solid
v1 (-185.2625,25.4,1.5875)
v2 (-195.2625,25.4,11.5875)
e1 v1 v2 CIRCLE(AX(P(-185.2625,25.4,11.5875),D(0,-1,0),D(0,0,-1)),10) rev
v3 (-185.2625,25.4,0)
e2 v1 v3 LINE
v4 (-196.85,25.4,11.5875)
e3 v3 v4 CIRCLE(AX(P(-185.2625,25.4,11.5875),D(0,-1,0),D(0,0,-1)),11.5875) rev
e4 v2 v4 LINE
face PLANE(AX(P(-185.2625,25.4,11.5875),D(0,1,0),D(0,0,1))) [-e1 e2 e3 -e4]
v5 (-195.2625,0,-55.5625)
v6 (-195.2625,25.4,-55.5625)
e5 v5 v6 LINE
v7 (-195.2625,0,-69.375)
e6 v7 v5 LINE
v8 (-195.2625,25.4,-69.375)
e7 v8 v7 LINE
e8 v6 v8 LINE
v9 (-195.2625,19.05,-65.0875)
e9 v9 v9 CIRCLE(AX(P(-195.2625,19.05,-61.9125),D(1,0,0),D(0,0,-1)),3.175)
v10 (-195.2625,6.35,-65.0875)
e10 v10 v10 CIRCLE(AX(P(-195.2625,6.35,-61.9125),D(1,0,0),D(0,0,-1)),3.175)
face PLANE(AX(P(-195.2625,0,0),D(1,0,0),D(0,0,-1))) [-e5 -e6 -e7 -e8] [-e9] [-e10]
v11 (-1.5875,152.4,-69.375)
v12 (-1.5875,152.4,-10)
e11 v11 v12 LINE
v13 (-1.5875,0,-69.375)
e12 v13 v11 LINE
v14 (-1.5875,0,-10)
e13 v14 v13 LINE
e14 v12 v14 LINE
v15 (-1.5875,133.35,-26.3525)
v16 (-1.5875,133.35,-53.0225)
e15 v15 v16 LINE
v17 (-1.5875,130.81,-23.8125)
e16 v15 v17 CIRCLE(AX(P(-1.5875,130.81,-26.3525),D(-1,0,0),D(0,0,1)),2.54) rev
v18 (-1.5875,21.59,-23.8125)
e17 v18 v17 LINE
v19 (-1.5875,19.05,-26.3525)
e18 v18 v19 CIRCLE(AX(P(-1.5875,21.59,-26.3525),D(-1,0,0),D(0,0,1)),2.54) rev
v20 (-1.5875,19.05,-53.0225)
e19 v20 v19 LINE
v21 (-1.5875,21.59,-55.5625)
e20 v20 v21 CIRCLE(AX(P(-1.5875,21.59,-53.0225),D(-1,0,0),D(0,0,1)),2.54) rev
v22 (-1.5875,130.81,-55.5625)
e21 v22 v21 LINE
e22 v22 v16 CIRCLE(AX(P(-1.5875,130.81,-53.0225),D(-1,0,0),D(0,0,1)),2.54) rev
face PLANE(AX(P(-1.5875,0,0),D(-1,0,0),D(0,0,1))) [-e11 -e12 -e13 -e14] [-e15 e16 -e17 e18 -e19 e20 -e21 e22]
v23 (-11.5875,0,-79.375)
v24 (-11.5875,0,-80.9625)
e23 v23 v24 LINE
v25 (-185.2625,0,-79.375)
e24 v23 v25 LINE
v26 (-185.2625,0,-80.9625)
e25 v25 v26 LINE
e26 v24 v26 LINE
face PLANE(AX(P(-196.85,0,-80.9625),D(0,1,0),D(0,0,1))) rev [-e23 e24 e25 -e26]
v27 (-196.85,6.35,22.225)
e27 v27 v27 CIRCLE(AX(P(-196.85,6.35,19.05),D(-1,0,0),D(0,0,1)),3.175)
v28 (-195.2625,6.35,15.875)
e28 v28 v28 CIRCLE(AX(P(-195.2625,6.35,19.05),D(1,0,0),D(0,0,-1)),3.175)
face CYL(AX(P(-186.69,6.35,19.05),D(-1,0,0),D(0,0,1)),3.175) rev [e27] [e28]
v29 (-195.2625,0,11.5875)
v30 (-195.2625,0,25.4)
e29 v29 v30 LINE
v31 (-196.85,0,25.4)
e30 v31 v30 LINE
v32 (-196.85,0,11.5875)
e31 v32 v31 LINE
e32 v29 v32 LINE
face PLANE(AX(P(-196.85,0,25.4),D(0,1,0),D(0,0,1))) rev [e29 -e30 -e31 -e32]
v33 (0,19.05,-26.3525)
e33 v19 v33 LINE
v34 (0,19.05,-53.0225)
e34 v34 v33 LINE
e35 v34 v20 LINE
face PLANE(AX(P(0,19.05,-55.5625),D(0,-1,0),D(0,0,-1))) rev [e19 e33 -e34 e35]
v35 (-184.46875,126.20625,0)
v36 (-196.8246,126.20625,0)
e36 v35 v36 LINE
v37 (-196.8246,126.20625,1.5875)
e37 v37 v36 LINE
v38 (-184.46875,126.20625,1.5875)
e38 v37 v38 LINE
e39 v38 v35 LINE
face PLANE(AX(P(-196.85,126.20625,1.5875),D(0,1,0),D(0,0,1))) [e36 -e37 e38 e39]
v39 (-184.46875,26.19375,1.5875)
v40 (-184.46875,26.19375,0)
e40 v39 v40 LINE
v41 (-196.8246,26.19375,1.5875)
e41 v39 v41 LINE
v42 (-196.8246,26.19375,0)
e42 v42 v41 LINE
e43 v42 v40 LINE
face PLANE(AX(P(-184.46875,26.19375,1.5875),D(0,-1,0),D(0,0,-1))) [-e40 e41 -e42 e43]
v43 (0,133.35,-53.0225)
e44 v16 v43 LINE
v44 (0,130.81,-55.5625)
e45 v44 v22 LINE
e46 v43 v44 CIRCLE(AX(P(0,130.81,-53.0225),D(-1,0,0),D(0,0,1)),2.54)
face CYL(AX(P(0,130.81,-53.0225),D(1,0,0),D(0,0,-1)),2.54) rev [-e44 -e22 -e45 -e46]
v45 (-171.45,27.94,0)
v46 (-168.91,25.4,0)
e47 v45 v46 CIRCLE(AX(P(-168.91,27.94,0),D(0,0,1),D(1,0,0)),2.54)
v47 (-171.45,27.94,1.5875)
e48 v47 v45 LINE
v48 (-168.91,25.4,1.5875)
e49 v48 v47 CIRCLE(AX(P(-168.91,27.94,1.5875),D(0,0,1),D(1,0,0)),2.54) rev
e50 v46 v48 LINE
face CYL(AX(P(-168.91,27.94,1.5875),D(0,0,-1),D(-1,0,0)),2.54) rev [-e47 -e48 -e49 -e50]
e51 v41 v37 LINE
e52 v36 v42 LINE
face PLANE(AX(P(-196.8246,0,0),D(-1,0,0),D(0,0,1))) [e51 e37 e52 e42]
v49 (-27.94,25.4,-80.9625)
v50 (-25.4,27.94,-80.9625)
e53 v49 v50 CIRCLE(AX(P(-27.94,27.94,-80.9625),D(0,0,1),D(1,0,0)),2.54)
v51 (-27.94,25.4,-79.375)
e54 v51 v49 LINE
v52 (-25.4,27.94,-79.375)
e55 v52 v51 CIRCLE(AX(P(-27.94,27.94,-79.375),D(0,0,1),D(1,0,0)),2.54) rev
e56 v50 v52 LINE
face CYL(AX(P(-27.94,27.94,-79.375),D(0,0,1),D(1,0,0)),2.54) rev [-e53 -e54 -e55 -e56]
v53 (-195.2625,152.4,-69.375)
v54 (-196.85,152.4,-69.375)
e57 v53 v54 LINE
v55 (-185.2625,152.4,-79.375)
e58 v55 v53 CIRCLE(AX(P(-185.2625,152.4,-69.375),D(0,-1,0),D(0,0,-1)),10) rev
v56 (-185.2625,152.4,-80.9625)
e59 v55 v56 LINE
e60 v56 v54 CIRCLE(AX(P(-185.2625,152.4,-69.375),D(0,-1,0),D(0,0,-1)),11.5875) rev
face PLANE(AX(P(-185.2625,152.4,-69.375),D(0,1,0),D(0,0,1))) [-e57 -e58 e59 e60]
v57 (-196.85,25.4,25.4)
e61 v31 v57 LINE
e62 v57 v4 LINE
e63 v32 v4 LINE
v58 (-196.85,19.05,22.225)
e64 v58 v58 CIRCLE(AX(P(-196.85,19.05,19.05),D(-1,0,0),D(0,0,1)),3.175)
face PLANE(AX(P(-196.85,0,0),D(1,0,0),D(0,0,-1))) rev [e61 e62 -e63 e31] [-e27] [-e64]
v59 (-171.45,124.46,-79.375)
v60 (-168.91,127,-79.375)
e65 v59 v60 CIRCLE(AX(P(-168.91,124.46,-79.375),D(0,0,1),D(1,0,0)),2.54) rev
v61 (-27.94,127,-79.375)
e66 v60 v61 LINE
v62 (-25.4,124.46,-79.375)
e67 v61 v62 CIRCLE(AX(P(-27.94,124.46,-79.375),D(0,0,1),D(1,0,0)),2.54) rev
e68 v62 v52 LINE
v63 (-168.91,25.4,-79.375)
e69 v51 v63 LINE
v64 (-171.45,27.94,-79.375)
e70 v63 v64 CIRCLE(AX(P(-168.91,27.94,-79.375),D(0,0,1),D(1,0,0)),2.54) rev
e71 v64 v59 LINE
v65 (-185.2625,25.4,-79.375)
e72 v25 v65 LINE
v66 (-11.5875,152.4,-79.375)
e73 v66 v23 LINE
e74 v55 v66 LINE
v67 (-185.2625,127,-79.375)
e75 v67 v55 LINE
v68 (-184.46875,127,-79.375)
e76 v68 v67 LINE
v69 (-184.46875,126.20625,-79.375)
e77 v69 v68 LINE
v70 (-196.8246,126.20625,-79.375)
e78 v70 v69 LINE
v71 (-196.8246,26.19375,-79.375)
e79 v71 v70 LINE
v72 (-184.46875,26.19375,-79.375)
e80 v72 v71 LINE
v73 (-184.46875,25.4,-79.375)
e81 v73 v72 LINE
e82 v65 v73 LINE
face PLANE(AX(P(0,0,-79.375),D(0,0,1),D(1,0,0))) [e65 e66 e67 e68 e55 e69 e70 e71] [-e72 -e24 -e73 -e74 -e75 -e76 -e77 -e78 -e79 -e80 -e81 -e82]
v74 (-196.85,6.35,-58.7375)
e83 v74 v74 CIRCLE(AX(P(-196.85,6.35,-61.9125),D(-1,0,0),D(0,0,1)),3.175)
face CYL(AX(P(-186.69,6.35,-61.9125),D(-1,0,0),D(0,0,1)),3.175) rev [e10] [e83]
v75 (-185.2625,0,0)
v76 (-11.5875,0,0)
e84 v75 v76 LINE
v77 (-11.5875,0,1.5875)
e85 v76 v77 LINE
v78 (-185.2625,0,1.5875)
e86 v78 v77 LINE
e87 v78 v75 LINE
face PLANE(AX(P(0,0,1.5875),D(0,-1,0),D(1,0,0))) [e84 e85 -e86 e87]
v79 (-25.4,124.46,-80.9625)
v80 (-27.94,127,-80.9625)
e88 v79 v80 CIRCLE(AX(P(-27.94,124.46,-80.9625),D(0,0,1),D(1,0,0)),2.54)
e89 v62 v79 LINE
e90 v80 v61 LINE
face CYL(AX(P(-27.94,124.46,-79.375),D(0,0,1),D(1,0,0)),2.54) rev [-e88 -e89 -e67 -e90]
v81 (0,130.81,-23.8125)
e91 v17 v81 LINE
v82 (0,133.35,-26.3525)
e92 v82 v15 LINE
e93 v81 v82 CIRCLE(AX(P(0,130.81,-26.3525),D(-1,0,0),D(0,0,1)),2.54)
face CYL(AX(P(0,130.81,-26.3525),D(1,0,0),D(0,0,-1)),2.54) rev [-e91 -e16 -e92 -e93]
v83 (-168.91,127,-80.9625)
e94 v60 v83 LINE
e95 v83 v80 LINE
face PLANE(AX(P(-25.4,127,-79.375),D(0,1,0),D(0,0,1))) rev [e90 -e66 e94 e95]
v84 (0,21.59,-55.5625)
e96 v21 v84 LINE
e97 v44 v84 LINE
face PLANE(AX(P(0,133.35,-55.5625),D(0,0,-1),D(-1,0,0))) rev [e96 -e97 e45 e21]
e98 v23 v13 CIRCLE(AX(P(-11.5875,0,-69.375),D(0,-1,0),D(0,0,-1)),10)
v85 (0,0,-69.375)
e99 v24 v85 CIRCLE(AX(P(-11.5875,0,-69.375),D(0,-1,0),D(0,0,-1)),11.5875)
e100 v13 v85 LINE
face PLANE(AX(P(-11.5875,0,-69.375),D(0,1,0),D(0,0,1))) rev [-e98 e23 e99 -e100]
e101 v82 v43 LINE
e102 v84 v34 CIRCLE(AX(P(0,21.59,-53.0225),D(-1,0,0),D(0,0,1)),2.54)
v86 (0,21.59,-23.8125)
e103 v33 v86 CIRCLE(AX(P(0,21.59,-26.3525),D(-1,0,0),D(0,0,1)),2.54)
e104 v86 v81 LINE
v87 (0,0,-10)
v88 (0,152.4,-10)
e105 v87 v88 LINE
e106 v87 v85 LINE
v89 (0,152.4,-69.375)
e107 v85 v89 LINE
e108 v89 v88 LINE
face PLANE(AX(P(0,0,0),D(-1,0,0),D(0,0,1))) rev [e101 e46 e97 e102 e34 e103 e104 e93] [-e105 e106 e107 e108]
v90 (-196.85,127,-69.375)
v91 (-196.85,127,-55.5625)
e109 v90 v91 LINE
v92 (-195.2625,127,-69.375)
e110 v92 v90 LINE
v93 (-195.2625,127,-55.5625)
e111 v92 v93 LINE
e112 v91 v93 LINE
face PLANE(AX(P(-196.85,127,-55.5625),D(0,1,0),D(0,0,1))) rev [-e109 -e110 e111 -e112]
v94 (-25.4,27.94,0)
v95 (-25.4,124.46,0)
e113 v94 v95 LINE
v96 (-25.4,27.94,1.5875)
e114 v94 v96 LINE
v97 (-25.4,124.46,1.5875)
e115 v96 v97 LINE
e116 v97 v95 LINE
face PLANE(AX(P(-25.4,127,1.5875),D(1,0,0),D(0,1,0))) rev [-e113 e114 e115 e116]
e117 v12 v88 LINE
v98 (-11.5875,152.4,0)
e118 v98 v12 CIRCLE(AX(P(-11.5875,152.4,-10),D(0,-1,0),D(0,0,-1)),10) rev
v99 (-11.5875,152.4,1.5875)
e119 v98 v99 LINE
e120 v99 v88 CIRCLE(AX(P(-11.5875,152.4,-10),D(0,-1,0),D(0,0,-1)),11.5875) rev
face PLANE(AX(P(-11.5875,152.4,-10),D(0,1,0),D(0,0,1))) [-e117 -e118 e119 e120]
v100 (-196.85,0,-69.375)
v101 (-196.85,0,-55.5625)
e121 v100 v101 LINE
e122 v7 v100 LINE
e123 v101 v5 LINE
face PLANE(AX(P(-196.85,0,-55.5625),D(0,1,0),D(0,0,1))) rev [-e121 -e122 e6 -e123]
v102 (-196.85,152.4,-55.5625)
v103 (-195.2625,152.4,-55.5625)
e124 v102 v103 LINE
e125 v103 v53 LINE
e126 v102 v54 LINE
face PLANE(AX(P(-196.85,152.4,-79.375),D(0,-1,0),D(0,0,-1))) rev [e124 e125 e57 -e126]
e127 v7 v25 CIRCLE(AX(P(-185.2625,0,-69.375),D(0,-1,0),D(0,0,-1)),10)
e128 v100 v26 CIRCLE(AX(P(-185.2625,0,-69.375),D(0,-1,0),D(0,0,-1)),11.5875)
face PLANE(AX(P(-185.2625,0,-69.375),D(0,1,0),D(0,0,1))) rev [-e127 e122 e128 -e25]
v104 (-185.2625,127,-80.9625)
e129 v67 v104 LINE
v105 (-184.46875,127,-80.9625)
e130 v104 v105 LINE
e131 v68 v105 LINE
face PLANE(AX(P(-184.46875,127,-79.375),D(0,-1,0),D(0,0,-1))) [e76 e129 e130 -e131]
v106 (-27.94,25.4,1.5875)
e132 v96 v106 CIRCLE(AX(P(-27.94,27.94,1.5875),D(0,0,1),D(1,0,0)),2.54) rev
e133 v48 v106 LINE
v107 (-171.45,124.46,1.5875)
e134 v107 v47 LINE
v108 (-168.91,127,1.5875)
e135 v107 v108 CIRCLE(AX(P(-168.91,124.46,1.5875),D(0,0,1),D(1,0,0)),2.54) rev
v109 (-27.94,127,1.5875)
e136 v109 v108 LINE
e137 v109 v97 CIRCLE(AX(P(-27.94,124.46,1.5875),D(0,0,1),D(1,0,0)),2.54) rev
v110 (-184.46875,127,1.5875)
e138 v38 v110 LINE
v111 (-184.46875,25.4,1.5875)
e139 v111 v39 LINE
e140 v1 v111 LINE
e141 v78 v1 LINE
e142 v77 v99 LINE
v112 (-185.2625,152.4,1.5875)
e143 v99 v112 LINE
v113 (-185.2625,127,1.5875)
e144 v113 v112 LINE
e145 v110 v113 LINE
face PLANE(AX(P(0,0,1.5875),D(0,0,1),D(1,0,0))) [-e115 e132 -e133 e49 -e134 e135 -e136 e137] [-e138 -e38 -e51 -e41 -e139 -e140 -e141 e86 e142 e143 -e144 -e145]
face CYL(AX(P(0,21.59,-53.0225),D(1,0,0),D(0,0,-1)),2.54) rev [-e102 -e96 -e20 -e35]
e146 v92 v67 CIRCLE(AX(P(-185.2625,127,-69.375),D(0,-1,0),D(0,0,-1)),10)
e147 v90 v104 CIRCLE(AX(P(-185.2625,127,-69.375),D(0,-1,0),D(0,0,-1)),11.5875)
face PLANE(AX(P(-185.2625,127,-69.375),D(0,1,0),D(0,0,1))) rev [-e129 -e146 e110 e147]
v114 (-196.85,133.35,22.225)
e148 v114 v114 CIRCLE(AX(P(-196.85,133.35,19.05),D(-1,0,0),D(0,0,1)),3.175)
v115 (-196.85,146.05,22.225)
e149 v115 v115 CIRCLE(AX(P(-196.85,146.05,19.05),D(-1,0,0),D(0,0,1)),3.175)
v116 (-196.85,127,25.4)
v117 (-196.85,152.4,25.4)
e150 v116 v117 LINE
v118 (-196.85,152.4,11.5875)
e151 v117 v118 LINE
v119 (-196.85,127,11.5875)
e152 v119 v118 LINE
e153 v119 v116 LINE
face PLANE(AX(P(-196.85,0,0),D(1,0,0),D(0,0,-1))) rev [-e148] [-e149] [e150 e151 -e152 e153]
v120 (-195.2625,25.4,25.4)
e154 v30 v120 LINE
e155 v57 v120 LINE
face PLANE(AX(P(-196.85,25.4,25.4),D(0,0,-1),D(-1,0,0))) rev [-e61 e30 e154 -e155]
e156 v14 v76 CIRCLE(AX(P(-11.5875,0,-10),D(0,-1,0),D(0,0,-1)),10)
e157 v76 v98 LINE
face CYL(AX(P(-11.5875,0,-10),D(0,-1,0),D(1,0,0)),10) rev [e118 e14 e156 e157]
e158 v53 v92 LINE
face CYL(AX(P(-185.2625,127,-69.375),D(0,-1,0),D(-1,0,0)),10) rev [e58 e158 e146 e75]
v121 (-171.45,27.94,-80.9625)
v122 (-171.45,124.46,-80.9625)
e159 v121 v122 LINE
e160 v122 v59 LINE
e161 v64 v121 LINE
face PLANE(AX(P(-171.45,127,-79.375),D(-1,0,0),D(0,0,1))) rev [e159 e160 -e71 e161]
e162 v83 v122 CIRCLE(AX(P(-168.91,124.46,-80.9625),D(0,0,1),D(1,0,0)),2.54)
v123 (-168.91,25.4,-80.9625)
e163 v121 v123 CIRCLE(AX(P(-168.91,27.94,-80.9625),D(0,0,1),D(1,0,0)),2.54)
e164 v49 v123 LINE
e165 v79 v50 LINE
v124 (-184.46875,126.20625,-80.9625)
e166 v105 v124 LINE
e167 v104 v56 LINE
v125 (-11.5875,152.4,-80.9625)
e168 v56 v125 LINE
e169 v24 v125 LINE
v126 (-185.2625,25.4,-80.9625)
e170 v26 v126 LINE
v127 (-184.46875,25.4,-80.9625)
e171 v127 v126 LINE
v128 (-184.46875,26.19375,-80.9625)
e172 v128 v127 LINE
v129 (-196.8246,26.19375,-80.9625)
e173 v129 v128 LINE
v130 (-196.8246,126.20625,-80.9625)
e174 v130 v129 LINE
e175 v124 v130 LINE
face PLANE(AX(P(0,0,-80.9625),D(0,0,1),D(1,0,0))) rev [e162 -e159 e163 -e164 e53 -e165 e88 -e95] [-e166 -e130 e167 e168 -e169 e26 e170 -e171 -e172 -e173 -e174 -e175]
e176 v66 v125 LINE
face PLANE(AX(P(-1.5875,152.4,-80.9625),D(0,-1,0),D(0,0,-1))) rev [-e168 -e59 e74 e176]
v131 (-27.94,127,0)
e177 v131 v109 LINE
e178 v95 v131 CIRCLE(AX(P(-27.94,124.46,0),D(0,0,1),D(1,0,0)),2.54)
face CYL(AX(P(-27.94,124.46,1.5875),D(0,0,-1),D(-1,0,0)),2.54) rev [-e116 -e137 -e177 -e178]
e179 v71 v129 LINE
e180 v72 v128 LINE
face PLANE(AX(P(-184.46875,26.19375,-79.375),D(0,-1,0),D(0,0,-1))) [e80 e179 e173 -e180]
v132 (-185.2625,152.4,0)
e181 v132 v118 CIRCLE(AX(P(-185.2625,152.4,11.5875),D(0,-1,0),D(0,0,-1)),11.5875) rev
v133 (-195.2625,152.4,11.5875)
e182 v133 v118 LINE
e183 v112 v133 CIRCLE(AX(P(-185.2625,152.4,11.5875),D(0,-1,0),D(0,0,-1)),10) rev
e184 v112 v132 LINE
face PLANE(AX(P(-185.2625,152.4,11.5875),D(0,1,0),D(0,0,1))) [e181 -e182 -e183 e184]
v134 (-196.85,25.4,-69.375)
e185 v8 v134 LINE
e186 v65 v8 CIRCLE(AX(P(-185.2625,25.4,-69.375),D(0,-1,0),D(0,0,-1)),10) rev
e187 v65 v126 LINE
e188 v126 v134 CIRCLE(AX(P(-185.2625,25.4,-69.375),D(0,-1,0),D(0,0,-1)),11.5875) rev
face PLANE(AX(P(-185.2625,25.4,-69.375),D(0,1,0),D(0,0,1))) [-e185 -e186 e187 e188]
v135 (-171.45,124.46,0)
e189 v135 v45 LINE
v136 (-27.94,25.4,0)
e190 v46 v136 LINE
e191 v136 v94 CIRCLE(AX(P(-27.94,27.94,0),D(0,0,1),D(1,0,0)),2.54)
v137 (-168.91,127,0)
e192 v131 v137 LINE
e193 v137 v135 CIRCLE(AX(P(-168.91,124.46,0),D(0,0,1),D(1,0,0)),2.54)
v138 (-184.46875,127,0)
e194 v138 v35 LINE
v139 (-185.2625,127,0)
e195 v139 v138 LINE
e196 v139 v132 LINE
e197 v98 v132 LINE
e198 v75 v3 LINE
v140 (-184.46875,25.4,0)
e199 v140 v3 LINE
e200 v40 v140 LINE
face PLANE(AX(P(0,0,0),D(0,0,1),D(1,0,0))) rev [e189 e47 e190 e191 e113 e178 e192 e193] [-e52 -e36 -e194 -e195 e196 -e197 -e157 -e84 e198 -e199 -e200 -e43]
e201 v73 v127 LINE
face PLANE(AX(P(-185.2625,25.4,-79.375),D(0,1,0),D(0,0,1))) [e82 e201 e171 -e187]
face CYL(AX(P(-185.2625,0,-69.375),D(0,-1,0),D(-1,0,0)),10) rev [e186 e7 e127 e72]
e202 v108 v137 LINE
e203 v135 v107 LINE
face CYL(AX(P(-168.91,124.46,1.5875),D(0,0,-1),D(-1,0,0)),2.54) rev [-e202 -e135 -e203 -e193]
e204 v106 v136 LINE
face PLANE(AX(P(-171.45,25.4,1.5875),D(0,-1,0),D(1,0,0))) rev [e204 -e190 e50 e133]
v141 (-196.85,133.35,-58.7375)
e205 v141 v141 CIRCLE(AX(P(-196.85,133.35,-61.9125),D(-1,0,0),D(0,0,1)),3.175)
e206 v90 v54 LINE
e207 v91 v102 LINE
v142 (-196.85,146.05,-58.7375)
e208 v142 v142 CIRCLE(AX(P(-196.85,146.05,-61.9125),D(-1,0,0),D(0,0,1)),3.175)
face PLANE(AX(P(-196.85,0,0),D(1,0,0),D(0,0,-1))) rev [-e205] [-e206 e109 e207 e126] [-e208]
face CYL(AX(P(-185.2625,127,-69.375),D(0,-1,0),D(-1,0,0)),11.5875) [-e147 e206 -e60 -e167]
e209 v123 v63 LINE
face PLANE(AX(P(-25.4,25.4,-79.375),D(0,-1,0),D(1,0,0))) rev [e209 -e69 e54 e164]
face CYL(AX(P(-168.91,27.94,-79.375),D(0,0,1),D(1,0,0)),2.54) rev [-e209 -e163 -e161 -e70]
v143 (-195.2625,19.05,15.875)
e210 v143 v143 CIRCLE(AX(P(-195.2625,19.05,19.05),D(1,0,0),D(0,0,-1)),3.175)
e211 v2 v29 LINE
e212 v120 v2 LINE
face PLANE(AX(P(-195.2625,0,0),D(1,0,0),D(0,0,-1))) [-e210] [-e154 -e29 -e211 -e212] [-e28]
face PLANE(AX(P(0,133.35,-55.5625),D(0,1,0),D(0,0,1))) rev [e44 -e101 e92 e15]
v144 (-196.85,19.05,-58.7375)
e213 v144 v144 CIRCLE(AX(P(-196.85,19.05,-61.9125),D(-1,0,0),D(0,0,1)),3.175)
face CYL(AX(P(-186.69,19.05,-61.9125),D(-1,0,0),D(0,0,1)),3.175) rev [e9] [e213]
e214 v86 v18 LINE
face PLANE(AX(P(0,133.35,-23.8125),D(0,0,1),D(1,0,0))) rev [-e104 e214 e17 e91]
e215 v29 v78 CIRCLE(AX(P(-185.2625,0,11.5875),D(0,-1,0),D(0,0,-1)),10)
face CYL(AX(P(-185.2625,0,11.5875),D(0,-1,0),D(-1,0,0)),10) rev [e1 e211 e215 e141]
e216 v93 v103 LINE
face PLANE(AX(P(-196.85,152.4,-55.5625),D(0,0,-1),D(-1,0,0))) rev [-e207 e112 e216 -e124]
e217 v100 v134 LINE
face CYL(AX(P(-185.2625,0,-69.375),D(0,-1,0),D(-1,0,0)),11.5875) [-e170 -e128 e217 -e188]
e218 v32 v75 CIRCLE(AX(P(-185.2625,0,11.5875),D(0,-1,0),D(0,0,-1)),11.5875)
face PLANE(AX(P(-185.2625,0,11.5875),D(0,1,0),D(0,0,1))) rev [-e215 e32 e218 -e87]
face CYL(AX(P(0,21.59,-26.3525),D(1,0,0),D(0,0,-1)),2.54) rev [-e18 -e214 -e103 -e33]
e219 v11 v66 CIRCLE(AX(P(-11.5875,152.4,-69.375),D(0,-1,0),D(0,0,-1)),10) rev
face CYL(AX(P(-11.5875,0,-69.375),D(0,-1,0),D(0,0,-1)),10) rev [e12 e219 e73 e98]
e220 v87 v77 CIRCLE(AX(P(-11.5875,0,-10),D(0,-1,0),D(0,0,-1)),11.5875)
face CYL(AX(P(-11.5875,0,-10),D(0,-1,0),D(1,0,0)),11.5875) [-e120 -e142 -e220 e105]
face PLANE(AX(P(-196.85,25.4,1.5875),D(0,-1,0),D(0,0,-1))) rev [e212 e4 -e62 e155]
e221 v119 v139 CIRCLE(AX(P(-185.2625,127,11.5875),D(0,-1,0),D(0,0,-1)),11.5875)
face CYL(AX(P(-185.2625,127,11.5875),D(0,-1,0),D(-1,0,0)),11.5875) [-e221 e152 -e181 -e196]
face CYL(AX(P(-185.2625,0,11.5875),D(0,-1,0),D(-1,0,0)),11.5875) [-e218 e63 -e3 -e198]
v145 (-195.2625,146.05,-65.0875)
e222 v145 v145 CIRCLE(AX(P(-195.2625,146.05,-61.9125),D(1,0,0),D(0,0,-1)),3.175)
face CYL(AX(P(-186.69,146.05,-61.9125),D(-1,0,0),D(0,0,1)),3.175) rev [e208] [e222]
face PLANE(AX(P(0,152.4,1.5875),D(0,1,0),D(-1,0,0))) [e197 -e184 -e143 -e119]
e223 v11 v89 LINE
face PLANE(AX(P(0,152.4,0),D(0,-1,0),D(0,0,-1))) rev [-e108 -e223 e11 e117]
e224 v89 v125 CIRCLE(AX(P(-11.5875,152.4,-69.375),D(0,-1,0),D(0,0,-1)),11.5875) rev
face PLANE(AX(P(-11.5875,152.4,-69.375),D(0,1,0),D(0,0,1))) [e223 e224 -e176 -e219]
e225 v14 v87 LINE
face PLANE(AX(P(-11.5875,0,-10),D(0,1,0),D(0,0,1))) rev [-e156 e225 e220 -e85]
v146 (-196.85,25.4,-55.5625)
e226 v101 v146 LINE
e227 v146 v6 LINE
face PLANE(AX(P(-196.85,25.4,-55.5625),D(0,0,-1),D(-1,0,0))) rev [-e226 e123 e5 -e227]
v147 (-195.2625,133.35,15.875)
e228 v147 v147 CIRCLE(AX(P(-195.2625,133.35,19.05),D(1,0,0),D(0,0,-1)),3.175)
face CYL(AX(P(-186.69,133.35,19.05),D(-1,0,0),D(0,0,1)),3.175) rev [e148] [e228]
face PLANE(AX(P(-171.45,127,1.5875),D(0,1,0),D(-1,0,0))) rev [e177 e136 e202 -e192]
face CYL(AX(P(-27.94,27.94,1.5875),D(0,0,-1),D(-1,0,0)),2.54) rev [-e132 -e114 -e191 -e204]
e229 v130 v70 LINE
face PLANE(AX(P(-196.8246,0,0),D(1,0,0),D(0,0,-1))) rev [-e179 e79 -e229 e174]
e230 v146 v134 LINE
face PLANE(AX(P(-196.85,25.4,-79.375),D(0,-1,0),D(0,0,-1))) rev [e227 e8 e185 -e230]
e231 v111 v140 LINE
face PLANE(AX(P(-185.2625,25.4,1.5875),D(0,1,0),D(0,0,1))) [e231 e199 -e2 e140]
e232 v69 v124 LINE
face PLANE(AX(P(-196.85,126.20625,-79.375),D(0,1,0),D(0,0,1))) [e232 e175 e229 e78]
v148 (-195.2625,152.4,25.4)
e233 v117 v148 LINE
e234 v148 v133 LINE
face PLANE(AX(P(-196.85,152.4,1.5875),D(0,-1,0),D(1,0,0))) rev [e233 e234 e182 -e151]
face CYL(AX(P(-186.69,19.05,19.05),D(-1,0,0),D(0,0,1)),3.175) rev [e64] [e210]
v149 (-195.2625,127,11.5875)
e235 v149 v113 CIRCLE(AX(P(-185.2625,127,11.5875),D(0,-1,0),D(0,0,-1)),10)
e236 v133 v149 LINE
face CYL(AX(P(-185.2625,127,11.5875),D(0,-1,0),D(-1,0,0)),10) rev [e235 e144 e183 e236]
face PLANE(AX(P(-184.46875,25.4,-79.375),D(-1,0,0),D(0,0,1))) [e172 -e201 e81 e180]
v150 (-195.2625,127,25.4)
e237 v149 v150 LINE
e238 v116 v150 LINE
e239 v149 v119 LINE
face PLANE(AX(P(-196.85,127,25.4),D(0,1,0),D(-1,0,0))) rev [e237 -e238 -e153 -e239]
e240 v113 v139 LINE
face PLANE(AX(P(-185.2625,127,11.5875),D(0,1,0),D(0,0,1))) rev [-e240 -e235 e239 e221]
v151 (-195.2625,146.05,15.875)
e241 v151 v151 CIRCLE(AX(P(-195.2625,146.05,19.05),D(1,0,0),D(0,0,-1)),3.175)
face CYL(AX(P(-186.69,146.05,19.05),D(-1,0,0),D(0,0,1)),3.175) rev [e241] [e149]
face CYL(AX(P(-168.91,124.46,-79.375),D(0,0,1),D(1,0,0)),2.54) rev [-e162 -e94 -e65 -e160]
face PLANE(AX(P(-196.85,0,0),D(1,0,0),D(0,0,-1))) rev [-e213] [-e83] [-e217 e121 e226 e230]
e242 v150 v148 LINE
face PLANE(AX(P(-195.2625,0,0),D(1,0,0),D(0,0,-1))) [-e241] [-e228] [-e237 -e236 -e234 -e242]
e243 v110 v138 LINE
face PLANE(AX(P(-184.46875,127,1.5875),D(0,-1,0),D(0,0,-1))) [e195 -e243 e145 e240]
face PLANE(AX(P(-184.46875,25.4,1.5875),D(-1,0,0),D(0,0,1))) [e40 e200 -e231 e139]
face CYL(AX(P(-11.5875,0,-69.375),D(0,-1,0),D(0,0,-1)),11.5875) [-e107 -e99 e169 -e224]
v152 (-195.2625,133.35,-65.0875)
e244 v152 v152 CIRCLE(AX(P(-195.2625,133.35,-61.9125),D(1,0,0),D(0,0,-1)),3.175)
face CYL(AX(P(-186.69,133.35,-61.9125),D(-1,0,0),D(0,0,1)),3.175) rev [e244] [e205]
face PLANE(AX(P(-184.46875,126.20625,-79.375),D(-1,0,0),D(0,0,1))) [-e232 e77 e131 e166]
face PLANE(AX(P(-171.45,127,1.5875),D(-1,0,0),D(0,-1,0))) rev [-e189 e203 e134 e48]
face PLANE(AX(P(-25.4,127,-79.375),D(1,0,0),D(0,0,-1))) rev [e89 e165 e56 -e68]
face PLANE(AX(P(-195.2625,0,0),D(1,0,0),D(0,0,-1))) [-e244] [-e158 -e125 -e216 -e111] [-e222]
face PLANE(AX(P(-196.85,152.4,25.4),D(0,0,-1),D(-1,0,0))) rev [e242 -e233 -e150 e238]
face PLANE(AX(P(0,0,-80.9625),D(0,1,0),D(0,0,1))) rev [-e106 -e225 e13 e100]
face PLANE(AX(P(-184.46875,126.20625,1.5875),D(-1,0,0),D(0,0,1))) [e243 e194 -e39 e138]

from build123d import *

# Parameters (mm, degrees)
SKETCH1_W                     = 196.85
SKETCH1_H                     = 152.4
SKETCH1_W_2                   = 146.05
SKETCH1_H_2                   = 101.6
BOSS_EXTRUDE1_DEPTH           = 1.5875
EDGE_FLANGE1_STRIP_W          = 26.35
EDGE_FLANGE1_STRIP_H          = 1.5875
EDGE_FLANGE1_STRIP_CUT_DEPTH  = 152.4
EDGE_FLANGE1_DEPTH            = 152.4
EDGE_FLANGE2_STRIP_W          = 26.35
EDGE_FLANGE2_STRIP_H          = 1.5875
EDGE_FLANGE2_STRIP_CUT_DEPTH  = 152.4
EDGE_FLANGE2_DEPTH            = 152.4
SKETCH16_W                    = 146.05
SKETCH16_H                    = 101.6
CUT_EXTRUDE1_DEPTH            = 1.5875
SKETCH17_W                    = 31.75
SKETCH17_H                    = 114.3
CUT_EXTRUDE2_DEPTH            = 1.5875
SKETCH25_W                    = 1.5875
SKETCH25_H                    = 101.6
CUT_EXTRUDE3_DEPTH            = 0.0254
EDGE_FLANGE5_STRIP_W          = 26.35
EDGE_FLANGE5_STRIP_H          = 1.5875
EDGE_FLANGE5_STRIP_CUT_DEPTH  = 25.4
EDGE_FLANGE5_RELIEF_W         = 27.14375
EDGE_FLANGE5_RELIEF_H         = 0.79375
EDGE_FLANGE5_RELIEF_CUT_DEPTH = 1.5875
EDGE_FLANGE5_DEPTH            = 25.4
EDGE_FLANGE6_STRIP_W          = 26.35
EDGE_FLANGE6_STRIP_H          = 1.5875
EDGE_FLANGE6_STRIP_CUT_DEPTH  = 25.4
EDGE_FLANGE6_RELIEF_W         = 27.14375
EDGE_FLANGE6_RELIEF_H         = 0.79375
EDGE_FLANGE6_RELIEF_CUT_DEPTH = 1.5875
EDGE_FLANGE6_DEPTH            = 25.4
SKETCH32_R                    = 3.175
CUT_EXTRUDE4_DEPTH            = 10.16
SKETCH33_R                    = 3.175
CUT_EXTRUDE5_DEPTH            = 10.16
FILLET1_R                     = 2.54
FILLET2_R                     = 2.54
FILLET3_R                     = 2.54
SKETCH35_W                    = 1.5875
SKETCH35_H                    = 101.6
CUT_EXTRUDE6_DEPTH            = 0.0254
EDGE_FLANGE7_STRIP_W          = 26.35
EDGE_FLANGE7_STRIP_H          = 1.5875
EDGE_FLANGE7_STRIP_CUT_DEPTH  = 25.4
EDGE_FLANGE7_RELIEF_W         = 27.14375
EDGE_FLANGE7_RELIEF_H         = 0.79375
EDGE_FLANGE7_RELIEF_CUT_DEPTH = 1.5875
EDGE_FLANGE7_DEPTH            = 25.4
EDGE_FLANGE8_STRIP_W          = 26.35
EDGE_FLANGE8_STRIP_H          = 1.5875
EDGE_FLANGE8_STRIP_CUT_DEPTH  = 25.4
EDGE_FLANGE8_RELIEF_W         = 27.14375
EDGE_FLANGE8_RELIEF_H         = 0.79375
EDGE_FLANGE8_RELIEF_CUT_DEPTH = 1.5875
EDGE_FLANGE8_DEPTH            = 25.4
SKETCH42_R                    = 3.175
CUT_EXTRUDE7_DEPTH            = 10.16
SKETCH43_R                    = 3.175
CUT_EXTRUDE8_DEPTH            = 10.16


# Sheet-metal steps are written as plain solids
with BuildPart() as part:
    # Sketch1 → Boss-Extrude1 (new body)
    with BuildSketch(Plane.XY):
        with Locations((-98.425, 76.2)):
            Rectangle(SKETCH1_W, SKETCH1_H)
        with Locations((-98.425, 76.2)):
            Rectangle(SKETCH1_W_2, SKETCH1_H_2, mode=Mode.SUBTRACT)
    extrude(amount=BOSS_EXTRUDE1_DEPTH)

    # Edge-Flange1 strip (across the edge) → Edge-Flange1 strip cut (cut)
    with BuildSketch(Plane(origin=(0, 152.4, 0), x_dir=(-1, 0, 0), z_dir=(0, -1, 0))):
        with Locations((-1.5875, -0.79375)):
            Rectangle(EDGE_FLANGE1_STRIP_W, EDGE_FLANGE1_STRIP_H)
    extrude(amount=EDGE_FLANGE1_STRIP_CUT_DEPTH, mode=Mode.SUBTRACT)

    # Edge-Flange1 section (across the edge) → Edge-Flange1 (add)
    with BuildSketch(Plane(origin=(0, 152.4, 0), x_dir=(-1, 0, 0), z_dir=(0, -1, 0))):
        with BuildLine():
            Line((0, 10), (0, 80.9625))
            Line((0, 80.9625), (1.5875, 80.9625))
            Line((1.5875, 80.9625), (1.5875, 10))
            ThreePointArc((1.5875, 10), (4.516432188, 2.928932188), (11.5875, 0))
            Line((11.5875, 0), (11.5875, -1.5875))
            ThreePointArc((11.5875, -1.5875), (3.393900173, 1.806400173), (0, 10))
        make_face()
    extrude(amount=EDGE_FLANGE1_DEPTH)

    # Edge-Flange2 strip (across the edge) → Edge-Flange2 strip cut (cut)
    with BuildSketch(Plane(origin=(-1.5875, 152.4, -80.9625), x_dir=(0, 0, 1), z_dir=(0, -1, 0))):
        with Locations((-1.5875, -0.79375)):
            Rectangle(EDGE_FLANGE2_STRIP_W, EDGE_FLANGE2_STRIP_H)
    extrude(amount=EDGE_FLANGE2_STRIP_CUT_DEPTH, mode=Mode.SUBTRACT)

    # Edge-Flange2 section (across the edge) → Edge-Flange2 (add)
    with BuildSketch(Plane(origin=(-1.5875, 152.4, -80.9625), x_dir=(0, 0, 1), z_dir=(0, -1, 0))):
        with BuildLine():
            Line((0, 10), (0, 195.2625))
            Line((0, 195.2625), (1.5875, 195.2625))
            Line((1.5875, 195.2625), (1.5875, 10))
            ThreePointArc((1.5875, 10), (4.516432188, 2.928932188), (11.5875, 0))
            Line((11.5875, 0), (11.5875, -1.5875))
            ThreePointArc((11.5875, -1.5875), (3.393900173, 1.806400173), (0, 10))
        make_face()
    extrude(amount=EDGE_FLANGE2_DEPTH)

    # Sketch16 → Cut-Extrude1 (cut)
    with BuildSketch(Plane(origin=(0, 0, -80.9625), x_dir=(-1, 0, 0), z_dir=(0, 0, -1))):
        with Locations((98.425, 76.2)):
            Rectangle(SKETCH16_W, SKETCH16_H)
    extrude(amount=-CUT_EXTRUDE1_DEPTH, mode=Mode.SUBTRACT)

    # Sketch17 → Cut-Extrude2 (cut)
    with BuildSketch(Plane.ZY.offset(1.5875)):
        with Locations((-39.6875, 76.2)):
            Rectangle(SKETCH17_W, SKETCH17_H)
    extrude(amount=-CUT_EXTRUDE2_DEPTH, mode=Mode.SUBTRACT)

    # Sketch25 → Cut-Extrude3 (cut)
    with BuildSketch(Plane.ZY.offset(196.85)):
        with Locations((-80.16875, 76.2)):
            Rectangle(SKETCH25_W, SKETCH25_H)
    extrude(amount=-CUT_EXTRUDE3_DEPTH, mode=Mode.SUBTRACT)

    # Edge-Flange5 strip (across the edge) → Edge-Flange5 strip cut (cut)
    with BuildSketch(Plane(origin=(-196.85, 152.4, -79.375), x_dir=(1, 0, 0), z_dir=(0, -1, 0))):
        with Locations((-1.5875, -0.79375)):
            Rectangle(EDGE_FLANGE5_STRIP_W, EDGE_FLANGE5_STRIP_H)
    extrude(amount=EDGE_FLANGE5_STRIP_CUT_DEPTH, mode=Mode.SUBTRACT)

    # Edge-Flange5 relief (on the sheet) → Edge-Flange5 relief cut (cut)
    with BuildSketch(Plane(origin=(-185.2625, 152.4, -79.375), x_dir=(1, 0, 0), z_dir=(0, 0, 1))):
        with Locations((-12.778125, -25.796875)):
            Rectangle(EDGE_FLANGE5_RELIEF_W, EDGE_FLANGE5_RELIEF_H)
    extrude(amount=-EDGE_FLANGE5_RELIEF_CUT_DEPTH, mode=Mode.SUBTRACT)

    # Edge-Flange5 section (across the edge) → Edge-Flange5 (add)
    with BuildSketch(Plane(origin=(-196.85, 152.4, -79.375), x_dir=(1, 0, 0), z_dir=(0, -1, 0))):
        with BuildLine():
            Line((0, 10), (0, 23.8125))
            Line((0, 23.8125), (1.5875, 23.8125))
            Line((1.5875, 23.8125), (1.5875, 10))
            ThreePointArc((1.5875, 10), (4.516432188, 2.928932188), (11.5875, 0))
            Line((11.5875, 0), (11.5875, -1.5875))
            ThreePointArc((11.5875, -1.5875), (3.393900173, 1.806400173), (0, 10))
        make_face()
    extrude(amount=EDGE_FLANGE5_DEPTH)

    # Edge-Flange6 strip (across the edge) → Edge-Flange6 strip cut (cut)
    with BuildSketch(Plane(origin=(-196.85, 25.4, -79.375), x_dir=(1, 0, 0), z_dir=(0, -1, 0))):
        with Locations((-1.5875, -0.79375)):
            Rectangle(EDGE_FLANGE6_STRIP_W, EDGE_FLANGE6_STRIP_H)
    extrude(amount=EDGE_FLANGE6_STRIP_CUT_DEPTH, mode=Mode.SUBTRACT)

    # Edge-Flange6 relief (on the sheet) → Edge-Flange6 relief cut (cut)
    with BuildSketch(Plane(origin=(-185.2625, 25.4, -79.375), x_dir=(1, 0, 0), z_dir=(0, 0, 1))):
        with Locations((-12.778125, 0.396875)):
            Rectangle(EDGE_FLANGE6_RELIEF_W, EDGE_FLANGE6_RELIEF_H)
    extrude(amount=-EDGE_FLANGE6_RELIEF_CUT_DEPTH, mode=Mode.SUBTRACT)

    # Edge-Flange6 section (across the edge) → Edge-Flange6 (add)
    with BuildSketch(Plane(origin=(-196.85, 25.4, -79.375), x_dir=(1, 0, 0), z_dir=(0, -1, 0))):
        with BuildLine():
            Line((0, 10), (0, 23.8125))
            Line((0, 23.8125), (1.5875, 23.8125))
            Line((1.5875, 23.8125), (1.5875, 10))
            ThreePointArc((1.5875, 10), (4.516432188, 2.928932188), (11.5875, 0))
            Line((11.5875, 0), (11.5875, -1.5875))
            ThreePointArc((11.5875, -1.5875), (3.393900173, 1.806400173), (0, 10))
        make_face()
    extrude(amount=EDGE_FLANGE6_DEPTH)

    # Sketch32 → Cut-Extrude4 (cut)
    with BuildSketch(Plane.ZY.offset(196.85)):
        with Locations((-61.9125, 146.05)):
            Circle(SKETCH32_R)
        with Locations((-61.9125, 133.35)):
            Circle(SKETCH32_R)
    extrude(amount=-CUT_EXTRUDE4_DEPTH, mode=Mode.SUBTRACT)

    # Sketch33 → Cut-Extrude5 (cut)
    with BuildSketch(Plane.ZY.offset(196.85)):
        with Locations((-61.9125, 19.05)):
            Circle(SKETCH33_R)
        with Locations((-61.9125, 6.35)):
            Circle(SKETCH33_R)
    extrude(amount=-CUT_EXTRUDE5_DEPTH, mode=Mode.SUBTRACT)

    # Fillet1
    fillet1_edges = [part.edges().sort_by_distance(p)[0] for p in [
        (-25.4, 127, 0.79375),
    ]]
    fillet(fillet1_edges, radius=FILLET1_R)

    # Fillet2
    fillet2_edges = [part.edges().sort_by_distance(p)[0] for p in [
        (-171.45, 25.4, 0.79375),
        (-25.4, 25.4, 0.79375),
        (-171.45, 127, 0.79375),
        (-25.4, 25.4, -80.16875),
        (-25.4, 127, -80.16875),
        (-171.45, 127, -80.16875),
    ]]
    fillet(fillet2_edges, radius=FILLET2_R)

    # Fillet3
    fillet3_edges = [part.edges().sort_by_distance(p)[0] for p in [
        (-0.79375, 19.05, -55.5625),
        (-0.79375, 133.35, -55.5625),
        (-0.79375, 133.35, -23.8125),
        (-0.79375, 19.05, -23.8125),
        (-171.45, 25.4, -80.16875),
    ]]
    fillet(fillet3_edges, radius=FILLET3_R)

    # Sketch35 → Cut-Extrude6 (cut)
    with BuildSketch(Plane.ZY.offset(196.85)):
        with Locations((0.79375, 76.2)):
            Rectangle(SKETCH35_W, SKETCH35_H)
    extrude(amount=-CUT_EXTRUDE6_DEPTH, mode=Mode.SUBTRACT)

    # Edge-Flange7 strip (across the edge) → Edge-Flange7 strip cut (cut)
    with BuildSketch(Plane(origin=(-196.85, 152.4, 1.5875), x_dir=(1, 0, 0), z_dir=(0, -1, 0))):
        with Locations((-1.5875, -0.79375)):
            Rectangle(EDGE_FLANGE7_STRIP_W, EDGE_FLANGE7_STRIP_H)
    extrude(amount=EDGE_FLANGE7_STRIP_CUT_DEPTH, mode=Mode.SUBTRACT)

    # Edge-Flange7 relief (on the sheet) → Edge-Flange7 relief cut (cut)
    with BuildSketch(Plane(origin=(-185.2625, 152.4, 1.5875), x_dir=(1, 0, 0), z_dir=(0, 0, 1))):
        with Locations((-12.778125, -25.796875)):
            Rectangle(EDGE_FLANGE7_RELIEF_W, EDGE_FLANGE7_RELIEF_H)
    extrude(amount=-EDGE_FLANGE7_RELIEF_CUT_DEPTH, mode=Mode.SUBTRACT)

    # Edge-Flange7 section (across the edge) → Edge-Flange7 (add)
    with BuildSketch(Plane(origin=(-196.85, 152.4, 1.5875), x_dir=(1, 0, 0), z_dir=(0, -1, 0))):
        with BuildLine():
            Line((0, 10), (0, 23.8125))
            Line((0, 23.8125), (1.5875, 23.8125))
            Line((1.5875, 23.8125), (1.5875, 10))
            ThreePointArc((1.5875, 10), (4.516432188, 2.928932188), (11.5875, 0))
            Line((11.5875, 0), (11.5875, -1.5875))
            ThreePointArc((11.5875, -1.5875), (3.393900173, 1.806400173), (0, 10))
        make_face()
    extrude(amount=EDGE_FLANGE7_DEPTH)

    # Edge-Flange8 strip (across the edge) → Edge-Flange8 strip cut (cut)
    with BuildSketch(Plane(origin=(-196.85, 25.4, 1.5875), x_dir=(1, 0, 0), z_dir=(0, -1, 0))):
        with Locations((-1.5875, -0.79375)):
            Rectangle(EDGE_FLANGE8_STRIP_W, EDGE_FLANGE8_STRIP_H)
    extrude(amount=EDGE_FLANGE8_STRIP_CUT_DEPTH, mode=Mode.SUBTRACT)

    # Edge-Flange8 relief (on the sheet) → Edge-Flange8 relief cut (cut)
    with BuildSketch(Plane(origin=(-185.2625, 25.4, 1.5875), x_dir=(1, 0, 0), z_dir=(0, 0, 1))):
        with Locations((-12.778125, 0.396875)):
            Rectangle(EDGE_FLANGE8_RELIEF_W, EDGE_FLANGE8_RELIEF_H)
    extrude(amount=-EDGE_FLANGE8_RELIEF_CUT_DEPTH, mode=Mode.SUBTRACT)

    # Edge-Flange8 section (across the edge) → Edge-Flange8 (add)
    with BuildSketch(Plane(origin=(-196.85, 25.4, 1.5875), x_dir=(1, 0, 0), z_dir=(0, -1, 0))):
        with BuildLine():
            Line((0, 10), (0, 23.8125))
            Line((0, 23.8125), (1.5875, 23.8125))
            Line((1.5875, 23.8125), (1.5875, 10))
            ThreePointArc((1.5875, 10), (4.516432188, 2.928932188), (11.5875, 0))
            Line((11.5875, 0), (11.5875, -1.5875))
            ThreePointArc((11.5875, -1.5875), (3.393900173, 1.806400173), (0, 10))
        make_face()
    extrude(amount=EDGE_FLANGE8_DEPTH)

    # Sketch42 → Cut-Extrude7 (cut)
    with BuildSketch(Plane.ZY.offset(196.85)):
        with Locations((19.05, 146.05)):
            Circle(SKETCH42_R)
        with Locations((19.05, 133.35)):
            Circle(SKETCH42_R)
    extrude(amount=-CUT_EXTRUDE7_DEPTH, mode=Mode.SUBTRACT)

    # Sketch43 → Cut-Extrude8 (cut)
    with BuildSketch(Plane.ZY.offset(196.85)):
        with Locations((19.05, 19.05)):
            Circle(SKETCH43_R)
        with Locations((19.05, 6.35)):
            Circle(SKETCH43_R)
    extrude(amount=-CUT_EXTRUDE8_DEPTH, mode=Mode.SUBTRACT)


solid = part.part
